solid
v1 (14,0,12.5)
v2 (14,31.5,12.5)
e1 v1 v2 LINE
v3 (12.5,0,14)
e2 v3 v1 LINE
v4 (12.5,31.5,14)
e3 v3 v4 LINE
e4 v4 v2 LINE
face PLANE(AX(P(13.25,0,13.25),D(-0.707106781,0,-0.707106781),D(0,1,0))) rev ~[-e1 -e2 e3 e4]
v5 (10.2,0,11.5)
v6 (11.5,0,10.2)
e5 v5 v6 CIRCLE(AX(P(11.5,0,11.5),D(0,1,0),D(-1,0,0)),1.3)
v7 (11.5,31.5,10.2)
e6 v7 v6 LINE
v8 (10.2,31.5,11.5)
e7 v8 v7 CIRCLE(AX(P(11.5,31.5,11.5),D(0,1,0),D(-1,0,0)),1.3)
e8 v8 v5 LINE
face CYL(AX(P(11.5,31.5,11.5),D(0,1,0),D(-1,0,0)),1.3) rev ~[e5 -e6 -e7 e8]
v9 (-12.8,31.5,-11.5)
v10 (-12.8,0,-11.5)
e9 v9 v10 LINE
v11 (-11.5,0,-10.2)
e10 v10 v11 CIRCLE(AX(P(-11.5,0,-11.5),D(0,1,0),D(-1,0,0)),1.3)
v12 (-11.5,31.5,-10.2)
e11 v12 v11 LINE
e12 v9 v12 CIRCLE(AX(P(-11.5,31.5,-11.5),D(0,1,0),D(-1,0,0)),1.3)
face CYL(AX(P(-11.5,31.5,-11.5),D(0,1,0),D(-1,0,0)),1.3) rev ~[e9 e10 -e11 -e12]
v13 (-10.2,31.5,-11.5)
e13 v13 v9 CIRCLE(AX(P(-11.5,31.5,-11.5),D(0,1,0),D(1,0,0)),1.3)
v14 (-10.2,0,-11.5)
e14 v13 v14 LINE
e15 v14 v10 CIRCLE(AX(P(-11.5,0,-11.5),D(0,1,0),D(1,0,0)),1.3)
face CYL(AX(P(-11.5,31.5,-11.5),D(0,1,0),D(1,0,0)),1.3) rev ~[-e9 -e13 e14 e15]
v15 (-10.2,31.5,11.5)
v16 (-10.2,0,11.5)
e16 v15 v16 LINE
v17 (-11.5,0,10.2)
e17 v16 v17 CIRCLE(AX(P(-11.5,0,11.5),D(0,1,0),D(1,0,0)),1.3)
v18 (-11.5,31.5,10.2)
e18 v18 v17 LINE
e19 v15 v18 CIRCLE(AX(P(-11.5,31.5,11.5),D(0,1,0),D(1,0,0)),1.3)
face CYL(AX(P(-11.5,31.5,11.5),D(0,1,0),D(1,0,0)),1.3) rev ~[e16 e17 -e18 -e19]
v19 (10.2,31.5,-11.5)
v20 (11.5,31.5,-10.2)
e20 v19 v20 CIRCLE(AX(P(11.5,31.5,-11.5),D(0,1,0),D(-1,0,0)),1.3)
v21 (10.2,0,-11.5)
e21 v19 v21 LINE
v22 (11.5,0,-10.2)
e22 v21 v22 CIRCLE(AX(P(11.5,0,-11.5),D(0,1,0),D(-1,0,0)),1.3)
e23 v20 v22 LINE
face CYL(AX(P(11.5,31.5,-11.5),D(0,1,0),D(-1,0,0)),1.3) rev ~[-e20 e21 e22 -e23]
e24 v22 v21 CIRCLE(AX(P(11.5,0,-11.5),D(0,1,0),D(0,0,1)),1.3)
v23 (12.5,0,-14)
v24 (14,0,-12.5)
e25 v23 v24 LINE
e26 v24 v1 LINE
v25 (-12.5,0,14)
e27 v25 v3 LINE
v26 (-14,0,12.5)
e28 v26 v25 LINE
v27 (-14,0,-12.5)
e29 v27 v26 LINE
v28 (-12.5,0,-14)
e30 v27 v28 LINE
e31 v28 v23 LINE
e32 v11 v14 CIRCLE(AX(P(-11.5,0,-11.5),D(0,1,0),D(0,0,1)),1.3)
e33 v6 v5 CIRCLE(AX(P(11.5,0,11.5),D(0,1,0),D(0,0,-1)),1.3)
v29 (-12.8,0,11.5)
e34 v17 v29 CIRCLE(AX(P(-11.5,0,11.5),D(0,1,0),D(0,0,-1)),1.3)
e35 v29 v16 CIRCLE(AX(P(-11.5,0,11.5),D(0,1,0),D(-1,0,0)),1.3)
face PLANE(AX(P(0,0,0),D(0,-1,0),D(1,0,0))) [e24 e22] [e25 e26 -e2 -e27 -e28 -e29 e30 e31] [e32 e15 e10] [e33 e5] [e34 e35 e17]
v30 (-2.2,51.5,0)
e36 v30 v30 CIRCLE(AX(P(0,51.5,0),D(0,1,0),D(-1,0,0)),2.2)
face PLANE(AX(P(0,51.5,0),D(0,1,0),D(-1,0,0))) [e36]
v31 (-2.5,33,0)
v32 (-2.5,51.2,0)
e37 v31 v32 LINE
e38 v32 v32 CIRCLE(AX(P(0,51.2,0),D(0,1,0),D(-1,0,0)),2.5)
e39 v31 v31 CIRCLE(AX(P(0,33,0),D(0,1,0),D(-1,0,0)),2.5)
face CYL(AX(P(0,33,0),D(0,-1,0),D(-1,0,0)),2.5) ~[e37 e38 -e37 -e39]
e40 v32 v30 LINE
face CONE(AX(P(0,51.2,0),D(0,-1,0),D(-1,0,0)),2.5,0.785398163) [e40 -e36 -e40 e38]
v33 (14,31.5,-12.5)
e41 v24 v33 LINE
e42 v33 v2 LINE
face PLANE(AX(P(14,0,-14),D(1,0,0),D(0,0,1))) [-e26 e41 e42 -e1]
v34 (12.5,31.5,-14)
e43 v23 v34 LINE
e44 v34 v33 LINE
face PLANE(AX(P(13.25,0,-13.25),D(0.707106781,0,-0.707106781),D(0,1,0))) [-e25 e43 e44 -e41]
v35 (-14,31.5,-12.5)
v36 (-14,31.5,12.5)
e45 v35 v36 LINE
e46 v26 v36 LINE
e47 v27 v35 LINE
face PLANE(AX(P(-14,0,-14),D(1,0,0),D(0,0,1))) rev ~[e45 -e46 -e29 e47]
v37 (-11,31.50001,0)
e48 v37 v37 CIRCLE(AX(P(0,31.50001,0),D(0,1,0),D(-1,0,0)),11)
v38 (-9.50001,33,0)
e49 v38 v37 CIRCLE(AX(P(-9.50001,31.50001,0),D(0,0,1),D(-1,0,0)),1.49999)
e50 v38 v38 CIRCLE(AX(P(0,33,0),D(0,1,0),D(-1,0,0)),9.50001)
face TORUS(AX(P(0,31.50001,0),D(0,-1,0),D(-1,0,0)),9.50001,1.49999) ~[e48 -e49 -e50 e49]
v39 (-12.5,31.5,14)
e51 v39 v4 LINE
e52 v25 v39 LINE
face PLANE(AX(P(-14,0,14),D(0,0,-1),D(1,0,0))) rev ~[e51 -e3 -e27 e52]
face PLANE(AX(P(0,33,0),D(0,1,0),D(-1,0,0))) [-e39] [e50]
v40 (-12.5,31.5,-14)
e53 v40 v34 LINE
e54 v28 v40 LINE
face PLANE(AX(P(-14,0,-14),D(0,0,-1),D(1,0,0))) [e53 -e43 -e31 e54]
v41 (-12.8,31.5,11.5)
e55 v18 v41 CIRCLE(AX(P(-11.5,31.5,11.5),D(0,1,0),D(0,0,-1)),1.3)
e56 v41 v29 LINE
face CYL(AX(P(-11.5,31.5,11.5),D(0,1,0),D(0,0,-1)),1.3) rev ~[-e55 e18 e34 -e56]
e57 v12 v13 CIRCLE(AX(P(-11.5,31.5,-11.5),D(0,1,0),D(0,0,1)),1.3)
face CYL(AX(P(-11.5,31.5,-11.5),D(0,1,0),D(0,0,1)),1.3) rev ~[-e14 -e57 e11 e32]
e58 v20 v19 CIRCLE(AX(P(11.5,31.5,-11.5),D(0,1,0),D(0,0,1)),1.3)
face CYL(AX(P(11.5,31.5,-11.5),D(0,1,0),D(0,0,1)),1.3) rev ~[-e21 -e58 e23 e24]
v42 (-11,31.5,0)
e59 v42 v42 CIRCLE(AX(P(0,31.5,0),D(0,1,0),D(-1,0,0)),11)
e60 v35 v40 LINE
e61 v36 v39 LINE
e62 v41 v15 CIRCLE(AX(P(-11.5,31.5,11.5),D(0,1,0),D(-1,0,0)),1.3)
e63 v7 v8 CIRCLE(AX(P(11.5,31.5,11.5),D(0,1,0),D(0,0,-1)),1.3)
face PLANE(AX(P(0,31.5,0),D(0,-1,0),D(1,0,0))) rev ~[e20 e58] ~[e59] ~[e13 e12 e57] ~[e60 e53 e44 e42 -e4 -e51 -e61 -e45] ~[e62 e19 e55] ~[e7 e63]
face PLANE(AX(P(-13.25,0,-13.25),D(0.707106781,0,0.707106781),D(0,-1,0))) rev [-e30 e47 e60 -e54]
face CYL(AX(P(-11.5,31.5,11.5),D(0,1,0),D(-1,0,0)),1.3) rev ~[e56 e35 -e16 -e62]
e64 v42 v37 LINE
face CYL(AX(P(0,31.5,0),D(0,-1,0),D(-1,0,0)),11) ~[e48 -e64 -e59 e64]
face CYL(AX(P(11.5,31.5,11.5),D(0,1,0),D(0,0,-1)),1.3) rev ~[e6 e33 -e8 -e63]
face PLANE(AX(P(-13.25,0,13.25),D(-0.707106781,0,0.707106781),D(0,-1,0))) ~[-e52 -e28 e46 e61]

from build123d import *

# Parameters (mm, degrees)
F0_W      = 28
F0_H      = 28
F1_DEPTH  = 31.5
F2_R      = 11
F3_DEPTH  = 1.5
F4_R      = 2.5
F5_DEPTH  = 18.5
F6_SIZE   = 1.5
F7_SIZE   = 0.3
F8_R      = 1.49999
F10_DEPTH = 31.5


# Not quite as in the source:
# - a fillet or chamfer is up to 0.001 mm smaller than in the source, because OpenCascade refuses the exact size


with BuildPart() as f1:
    # F0 (on Front) → F1 (new body)
    with BuildSketch(Plane.XZ):
        Rectangle(F0_W, F0_H)
    extrude(amount=-F1_DEPTH)

    # F2 (on face) → F3 (join)
    with BuildSketch(Plane(origin=(0, 31.5, 0), x_dir=(-1, 0, 0), z_dir=(0, 1, 0))):
        Circle(F2_R)
    extrude(amount=F3_DEPTH)

    # F4 (on face) → F5 (join)
    with BuildSketch(Plane(origin=(0, 33, 0), x_dir=(-1, 0, 0), z_dir=(0, 1, 0))):
        Circle(F4_R)
    extrude(amount=F5_DEPTH)

    # F6
    f6_edges = [f1.edges().sort_by_distance(p)[0] for p in [
        (14, 15.75, 14),
        (14, 15.75, -14),
        (-14, 15.75, -14),
        (-14, 15.75, 14),
    ]]
    chamfer(f6_edges, length=F6_SIZE)

    # F7
    f7_edges = [f1.edges().sort_by_distance(p)[0] for p in [
        (2.5, 51.5, 0),
    ]]
    chamfer(f7_edges, length=F7_SIZE)

    # F8 (radius 1.5 in the source; OpenCascade refuses exactly that, so slightly less here)
    f8_edges = [f1.edges().sort_by_distance(p)[0] for p in [
        (11, 33, 0),
    ]]
    fillet(f8_edges, radius=F8_R)

    # F9 (on face) → F10 (cut)
    with BuildSketch(Plane(origin=(0, 31.5, 0), x_dir=(-1, 0, 0), z_dir=(0, 1, 0))):
        with BuildLine():
            Line((-11.5, -11.5), (-11.5, -10.2))
            ThreePointArc((-11.5, -10.2), (-12.4192388155, -12.4192388155), (-10.2, -11.5))
            Line((-10.2, -11.5), (-11.5, -11.5))
        make_face()
        with BuildLine():
            ThreePointArc((-10.2, -11.5), (-10.5807611845, -10.5807611845), (-11.5, -10.2))
            Line((-11.5, -10.2), (-11.5, -11.5))
            Line((-11.5, -11.5), (-10.2, -11.5))
        make_face()
        with BuildLine():
            ThreePointArc((12.8, -11.5), (12.4192388155, -10.5807611845), (11.5, -10.2))
            Line((11.5, -10.2), (11.5, -11.5))
            Line((11.5, -11.5), (10.2, -11.5))
            ThreePointArc((10.2, -11.5), (11.5, -12.8), (12.8, -11.5))
        make_face()
        with BuildLine():
            Line((11.5, -11.5), (11.5, -10.2))
            ThreePointArc((11.5, -10.2), (10.5807611845, -10.5807611845), (10.2, -11.5))
            Line((10.2, -11.5), (11.5, -11.5))
        make_face()
        with BuildLine():
            Line((11.5, 11.5), (10.2, 11.5))
            ThreePointArc((10.2, 11.5), (10.5807611845, 10.5807611845), (11.5, 10.2))
            Line((11.5, 10.2), (11.5, 11.5))
        make_face()
        with BuildLine():
            ThreePointArc((12.8, 11.5), (11.5, 12.8), (10.2, 11.5))
            Line((10.2, 11.5), (11.5, 11.5))
            Line((11.5, 11.5), (11.5, 10.2))
            ThreePointArc((11.5, 10.2), (12.4192388155, 10.5807611845), (12.8, 11.5))
        make_face()
        with BuildLine():
            ThreePointArc((-11.5, 10.2), (-10.5807611845, 10.5807611845), (-10.2, 11.5))
            Line((-10.2, 11.5), (-11.5, 11.5))
            Line((-11.5, 11.5), (-11.5, 10.2))
        make_face()
        with BuildLine():
            Line((-11.5, 11.5), (-10.2, 11.5))
            ThreePointArc((-10.2, 11.5), (-12.4192388155, 12.4192388155), (-11.5, 10.2))
            Line((-11.5, 10.2), (-11.5, 11.5))
        make_face()
    extrude(amount=-F10_DEPTH, mode=Mode.SUBTRACT)


solid = f1.part
